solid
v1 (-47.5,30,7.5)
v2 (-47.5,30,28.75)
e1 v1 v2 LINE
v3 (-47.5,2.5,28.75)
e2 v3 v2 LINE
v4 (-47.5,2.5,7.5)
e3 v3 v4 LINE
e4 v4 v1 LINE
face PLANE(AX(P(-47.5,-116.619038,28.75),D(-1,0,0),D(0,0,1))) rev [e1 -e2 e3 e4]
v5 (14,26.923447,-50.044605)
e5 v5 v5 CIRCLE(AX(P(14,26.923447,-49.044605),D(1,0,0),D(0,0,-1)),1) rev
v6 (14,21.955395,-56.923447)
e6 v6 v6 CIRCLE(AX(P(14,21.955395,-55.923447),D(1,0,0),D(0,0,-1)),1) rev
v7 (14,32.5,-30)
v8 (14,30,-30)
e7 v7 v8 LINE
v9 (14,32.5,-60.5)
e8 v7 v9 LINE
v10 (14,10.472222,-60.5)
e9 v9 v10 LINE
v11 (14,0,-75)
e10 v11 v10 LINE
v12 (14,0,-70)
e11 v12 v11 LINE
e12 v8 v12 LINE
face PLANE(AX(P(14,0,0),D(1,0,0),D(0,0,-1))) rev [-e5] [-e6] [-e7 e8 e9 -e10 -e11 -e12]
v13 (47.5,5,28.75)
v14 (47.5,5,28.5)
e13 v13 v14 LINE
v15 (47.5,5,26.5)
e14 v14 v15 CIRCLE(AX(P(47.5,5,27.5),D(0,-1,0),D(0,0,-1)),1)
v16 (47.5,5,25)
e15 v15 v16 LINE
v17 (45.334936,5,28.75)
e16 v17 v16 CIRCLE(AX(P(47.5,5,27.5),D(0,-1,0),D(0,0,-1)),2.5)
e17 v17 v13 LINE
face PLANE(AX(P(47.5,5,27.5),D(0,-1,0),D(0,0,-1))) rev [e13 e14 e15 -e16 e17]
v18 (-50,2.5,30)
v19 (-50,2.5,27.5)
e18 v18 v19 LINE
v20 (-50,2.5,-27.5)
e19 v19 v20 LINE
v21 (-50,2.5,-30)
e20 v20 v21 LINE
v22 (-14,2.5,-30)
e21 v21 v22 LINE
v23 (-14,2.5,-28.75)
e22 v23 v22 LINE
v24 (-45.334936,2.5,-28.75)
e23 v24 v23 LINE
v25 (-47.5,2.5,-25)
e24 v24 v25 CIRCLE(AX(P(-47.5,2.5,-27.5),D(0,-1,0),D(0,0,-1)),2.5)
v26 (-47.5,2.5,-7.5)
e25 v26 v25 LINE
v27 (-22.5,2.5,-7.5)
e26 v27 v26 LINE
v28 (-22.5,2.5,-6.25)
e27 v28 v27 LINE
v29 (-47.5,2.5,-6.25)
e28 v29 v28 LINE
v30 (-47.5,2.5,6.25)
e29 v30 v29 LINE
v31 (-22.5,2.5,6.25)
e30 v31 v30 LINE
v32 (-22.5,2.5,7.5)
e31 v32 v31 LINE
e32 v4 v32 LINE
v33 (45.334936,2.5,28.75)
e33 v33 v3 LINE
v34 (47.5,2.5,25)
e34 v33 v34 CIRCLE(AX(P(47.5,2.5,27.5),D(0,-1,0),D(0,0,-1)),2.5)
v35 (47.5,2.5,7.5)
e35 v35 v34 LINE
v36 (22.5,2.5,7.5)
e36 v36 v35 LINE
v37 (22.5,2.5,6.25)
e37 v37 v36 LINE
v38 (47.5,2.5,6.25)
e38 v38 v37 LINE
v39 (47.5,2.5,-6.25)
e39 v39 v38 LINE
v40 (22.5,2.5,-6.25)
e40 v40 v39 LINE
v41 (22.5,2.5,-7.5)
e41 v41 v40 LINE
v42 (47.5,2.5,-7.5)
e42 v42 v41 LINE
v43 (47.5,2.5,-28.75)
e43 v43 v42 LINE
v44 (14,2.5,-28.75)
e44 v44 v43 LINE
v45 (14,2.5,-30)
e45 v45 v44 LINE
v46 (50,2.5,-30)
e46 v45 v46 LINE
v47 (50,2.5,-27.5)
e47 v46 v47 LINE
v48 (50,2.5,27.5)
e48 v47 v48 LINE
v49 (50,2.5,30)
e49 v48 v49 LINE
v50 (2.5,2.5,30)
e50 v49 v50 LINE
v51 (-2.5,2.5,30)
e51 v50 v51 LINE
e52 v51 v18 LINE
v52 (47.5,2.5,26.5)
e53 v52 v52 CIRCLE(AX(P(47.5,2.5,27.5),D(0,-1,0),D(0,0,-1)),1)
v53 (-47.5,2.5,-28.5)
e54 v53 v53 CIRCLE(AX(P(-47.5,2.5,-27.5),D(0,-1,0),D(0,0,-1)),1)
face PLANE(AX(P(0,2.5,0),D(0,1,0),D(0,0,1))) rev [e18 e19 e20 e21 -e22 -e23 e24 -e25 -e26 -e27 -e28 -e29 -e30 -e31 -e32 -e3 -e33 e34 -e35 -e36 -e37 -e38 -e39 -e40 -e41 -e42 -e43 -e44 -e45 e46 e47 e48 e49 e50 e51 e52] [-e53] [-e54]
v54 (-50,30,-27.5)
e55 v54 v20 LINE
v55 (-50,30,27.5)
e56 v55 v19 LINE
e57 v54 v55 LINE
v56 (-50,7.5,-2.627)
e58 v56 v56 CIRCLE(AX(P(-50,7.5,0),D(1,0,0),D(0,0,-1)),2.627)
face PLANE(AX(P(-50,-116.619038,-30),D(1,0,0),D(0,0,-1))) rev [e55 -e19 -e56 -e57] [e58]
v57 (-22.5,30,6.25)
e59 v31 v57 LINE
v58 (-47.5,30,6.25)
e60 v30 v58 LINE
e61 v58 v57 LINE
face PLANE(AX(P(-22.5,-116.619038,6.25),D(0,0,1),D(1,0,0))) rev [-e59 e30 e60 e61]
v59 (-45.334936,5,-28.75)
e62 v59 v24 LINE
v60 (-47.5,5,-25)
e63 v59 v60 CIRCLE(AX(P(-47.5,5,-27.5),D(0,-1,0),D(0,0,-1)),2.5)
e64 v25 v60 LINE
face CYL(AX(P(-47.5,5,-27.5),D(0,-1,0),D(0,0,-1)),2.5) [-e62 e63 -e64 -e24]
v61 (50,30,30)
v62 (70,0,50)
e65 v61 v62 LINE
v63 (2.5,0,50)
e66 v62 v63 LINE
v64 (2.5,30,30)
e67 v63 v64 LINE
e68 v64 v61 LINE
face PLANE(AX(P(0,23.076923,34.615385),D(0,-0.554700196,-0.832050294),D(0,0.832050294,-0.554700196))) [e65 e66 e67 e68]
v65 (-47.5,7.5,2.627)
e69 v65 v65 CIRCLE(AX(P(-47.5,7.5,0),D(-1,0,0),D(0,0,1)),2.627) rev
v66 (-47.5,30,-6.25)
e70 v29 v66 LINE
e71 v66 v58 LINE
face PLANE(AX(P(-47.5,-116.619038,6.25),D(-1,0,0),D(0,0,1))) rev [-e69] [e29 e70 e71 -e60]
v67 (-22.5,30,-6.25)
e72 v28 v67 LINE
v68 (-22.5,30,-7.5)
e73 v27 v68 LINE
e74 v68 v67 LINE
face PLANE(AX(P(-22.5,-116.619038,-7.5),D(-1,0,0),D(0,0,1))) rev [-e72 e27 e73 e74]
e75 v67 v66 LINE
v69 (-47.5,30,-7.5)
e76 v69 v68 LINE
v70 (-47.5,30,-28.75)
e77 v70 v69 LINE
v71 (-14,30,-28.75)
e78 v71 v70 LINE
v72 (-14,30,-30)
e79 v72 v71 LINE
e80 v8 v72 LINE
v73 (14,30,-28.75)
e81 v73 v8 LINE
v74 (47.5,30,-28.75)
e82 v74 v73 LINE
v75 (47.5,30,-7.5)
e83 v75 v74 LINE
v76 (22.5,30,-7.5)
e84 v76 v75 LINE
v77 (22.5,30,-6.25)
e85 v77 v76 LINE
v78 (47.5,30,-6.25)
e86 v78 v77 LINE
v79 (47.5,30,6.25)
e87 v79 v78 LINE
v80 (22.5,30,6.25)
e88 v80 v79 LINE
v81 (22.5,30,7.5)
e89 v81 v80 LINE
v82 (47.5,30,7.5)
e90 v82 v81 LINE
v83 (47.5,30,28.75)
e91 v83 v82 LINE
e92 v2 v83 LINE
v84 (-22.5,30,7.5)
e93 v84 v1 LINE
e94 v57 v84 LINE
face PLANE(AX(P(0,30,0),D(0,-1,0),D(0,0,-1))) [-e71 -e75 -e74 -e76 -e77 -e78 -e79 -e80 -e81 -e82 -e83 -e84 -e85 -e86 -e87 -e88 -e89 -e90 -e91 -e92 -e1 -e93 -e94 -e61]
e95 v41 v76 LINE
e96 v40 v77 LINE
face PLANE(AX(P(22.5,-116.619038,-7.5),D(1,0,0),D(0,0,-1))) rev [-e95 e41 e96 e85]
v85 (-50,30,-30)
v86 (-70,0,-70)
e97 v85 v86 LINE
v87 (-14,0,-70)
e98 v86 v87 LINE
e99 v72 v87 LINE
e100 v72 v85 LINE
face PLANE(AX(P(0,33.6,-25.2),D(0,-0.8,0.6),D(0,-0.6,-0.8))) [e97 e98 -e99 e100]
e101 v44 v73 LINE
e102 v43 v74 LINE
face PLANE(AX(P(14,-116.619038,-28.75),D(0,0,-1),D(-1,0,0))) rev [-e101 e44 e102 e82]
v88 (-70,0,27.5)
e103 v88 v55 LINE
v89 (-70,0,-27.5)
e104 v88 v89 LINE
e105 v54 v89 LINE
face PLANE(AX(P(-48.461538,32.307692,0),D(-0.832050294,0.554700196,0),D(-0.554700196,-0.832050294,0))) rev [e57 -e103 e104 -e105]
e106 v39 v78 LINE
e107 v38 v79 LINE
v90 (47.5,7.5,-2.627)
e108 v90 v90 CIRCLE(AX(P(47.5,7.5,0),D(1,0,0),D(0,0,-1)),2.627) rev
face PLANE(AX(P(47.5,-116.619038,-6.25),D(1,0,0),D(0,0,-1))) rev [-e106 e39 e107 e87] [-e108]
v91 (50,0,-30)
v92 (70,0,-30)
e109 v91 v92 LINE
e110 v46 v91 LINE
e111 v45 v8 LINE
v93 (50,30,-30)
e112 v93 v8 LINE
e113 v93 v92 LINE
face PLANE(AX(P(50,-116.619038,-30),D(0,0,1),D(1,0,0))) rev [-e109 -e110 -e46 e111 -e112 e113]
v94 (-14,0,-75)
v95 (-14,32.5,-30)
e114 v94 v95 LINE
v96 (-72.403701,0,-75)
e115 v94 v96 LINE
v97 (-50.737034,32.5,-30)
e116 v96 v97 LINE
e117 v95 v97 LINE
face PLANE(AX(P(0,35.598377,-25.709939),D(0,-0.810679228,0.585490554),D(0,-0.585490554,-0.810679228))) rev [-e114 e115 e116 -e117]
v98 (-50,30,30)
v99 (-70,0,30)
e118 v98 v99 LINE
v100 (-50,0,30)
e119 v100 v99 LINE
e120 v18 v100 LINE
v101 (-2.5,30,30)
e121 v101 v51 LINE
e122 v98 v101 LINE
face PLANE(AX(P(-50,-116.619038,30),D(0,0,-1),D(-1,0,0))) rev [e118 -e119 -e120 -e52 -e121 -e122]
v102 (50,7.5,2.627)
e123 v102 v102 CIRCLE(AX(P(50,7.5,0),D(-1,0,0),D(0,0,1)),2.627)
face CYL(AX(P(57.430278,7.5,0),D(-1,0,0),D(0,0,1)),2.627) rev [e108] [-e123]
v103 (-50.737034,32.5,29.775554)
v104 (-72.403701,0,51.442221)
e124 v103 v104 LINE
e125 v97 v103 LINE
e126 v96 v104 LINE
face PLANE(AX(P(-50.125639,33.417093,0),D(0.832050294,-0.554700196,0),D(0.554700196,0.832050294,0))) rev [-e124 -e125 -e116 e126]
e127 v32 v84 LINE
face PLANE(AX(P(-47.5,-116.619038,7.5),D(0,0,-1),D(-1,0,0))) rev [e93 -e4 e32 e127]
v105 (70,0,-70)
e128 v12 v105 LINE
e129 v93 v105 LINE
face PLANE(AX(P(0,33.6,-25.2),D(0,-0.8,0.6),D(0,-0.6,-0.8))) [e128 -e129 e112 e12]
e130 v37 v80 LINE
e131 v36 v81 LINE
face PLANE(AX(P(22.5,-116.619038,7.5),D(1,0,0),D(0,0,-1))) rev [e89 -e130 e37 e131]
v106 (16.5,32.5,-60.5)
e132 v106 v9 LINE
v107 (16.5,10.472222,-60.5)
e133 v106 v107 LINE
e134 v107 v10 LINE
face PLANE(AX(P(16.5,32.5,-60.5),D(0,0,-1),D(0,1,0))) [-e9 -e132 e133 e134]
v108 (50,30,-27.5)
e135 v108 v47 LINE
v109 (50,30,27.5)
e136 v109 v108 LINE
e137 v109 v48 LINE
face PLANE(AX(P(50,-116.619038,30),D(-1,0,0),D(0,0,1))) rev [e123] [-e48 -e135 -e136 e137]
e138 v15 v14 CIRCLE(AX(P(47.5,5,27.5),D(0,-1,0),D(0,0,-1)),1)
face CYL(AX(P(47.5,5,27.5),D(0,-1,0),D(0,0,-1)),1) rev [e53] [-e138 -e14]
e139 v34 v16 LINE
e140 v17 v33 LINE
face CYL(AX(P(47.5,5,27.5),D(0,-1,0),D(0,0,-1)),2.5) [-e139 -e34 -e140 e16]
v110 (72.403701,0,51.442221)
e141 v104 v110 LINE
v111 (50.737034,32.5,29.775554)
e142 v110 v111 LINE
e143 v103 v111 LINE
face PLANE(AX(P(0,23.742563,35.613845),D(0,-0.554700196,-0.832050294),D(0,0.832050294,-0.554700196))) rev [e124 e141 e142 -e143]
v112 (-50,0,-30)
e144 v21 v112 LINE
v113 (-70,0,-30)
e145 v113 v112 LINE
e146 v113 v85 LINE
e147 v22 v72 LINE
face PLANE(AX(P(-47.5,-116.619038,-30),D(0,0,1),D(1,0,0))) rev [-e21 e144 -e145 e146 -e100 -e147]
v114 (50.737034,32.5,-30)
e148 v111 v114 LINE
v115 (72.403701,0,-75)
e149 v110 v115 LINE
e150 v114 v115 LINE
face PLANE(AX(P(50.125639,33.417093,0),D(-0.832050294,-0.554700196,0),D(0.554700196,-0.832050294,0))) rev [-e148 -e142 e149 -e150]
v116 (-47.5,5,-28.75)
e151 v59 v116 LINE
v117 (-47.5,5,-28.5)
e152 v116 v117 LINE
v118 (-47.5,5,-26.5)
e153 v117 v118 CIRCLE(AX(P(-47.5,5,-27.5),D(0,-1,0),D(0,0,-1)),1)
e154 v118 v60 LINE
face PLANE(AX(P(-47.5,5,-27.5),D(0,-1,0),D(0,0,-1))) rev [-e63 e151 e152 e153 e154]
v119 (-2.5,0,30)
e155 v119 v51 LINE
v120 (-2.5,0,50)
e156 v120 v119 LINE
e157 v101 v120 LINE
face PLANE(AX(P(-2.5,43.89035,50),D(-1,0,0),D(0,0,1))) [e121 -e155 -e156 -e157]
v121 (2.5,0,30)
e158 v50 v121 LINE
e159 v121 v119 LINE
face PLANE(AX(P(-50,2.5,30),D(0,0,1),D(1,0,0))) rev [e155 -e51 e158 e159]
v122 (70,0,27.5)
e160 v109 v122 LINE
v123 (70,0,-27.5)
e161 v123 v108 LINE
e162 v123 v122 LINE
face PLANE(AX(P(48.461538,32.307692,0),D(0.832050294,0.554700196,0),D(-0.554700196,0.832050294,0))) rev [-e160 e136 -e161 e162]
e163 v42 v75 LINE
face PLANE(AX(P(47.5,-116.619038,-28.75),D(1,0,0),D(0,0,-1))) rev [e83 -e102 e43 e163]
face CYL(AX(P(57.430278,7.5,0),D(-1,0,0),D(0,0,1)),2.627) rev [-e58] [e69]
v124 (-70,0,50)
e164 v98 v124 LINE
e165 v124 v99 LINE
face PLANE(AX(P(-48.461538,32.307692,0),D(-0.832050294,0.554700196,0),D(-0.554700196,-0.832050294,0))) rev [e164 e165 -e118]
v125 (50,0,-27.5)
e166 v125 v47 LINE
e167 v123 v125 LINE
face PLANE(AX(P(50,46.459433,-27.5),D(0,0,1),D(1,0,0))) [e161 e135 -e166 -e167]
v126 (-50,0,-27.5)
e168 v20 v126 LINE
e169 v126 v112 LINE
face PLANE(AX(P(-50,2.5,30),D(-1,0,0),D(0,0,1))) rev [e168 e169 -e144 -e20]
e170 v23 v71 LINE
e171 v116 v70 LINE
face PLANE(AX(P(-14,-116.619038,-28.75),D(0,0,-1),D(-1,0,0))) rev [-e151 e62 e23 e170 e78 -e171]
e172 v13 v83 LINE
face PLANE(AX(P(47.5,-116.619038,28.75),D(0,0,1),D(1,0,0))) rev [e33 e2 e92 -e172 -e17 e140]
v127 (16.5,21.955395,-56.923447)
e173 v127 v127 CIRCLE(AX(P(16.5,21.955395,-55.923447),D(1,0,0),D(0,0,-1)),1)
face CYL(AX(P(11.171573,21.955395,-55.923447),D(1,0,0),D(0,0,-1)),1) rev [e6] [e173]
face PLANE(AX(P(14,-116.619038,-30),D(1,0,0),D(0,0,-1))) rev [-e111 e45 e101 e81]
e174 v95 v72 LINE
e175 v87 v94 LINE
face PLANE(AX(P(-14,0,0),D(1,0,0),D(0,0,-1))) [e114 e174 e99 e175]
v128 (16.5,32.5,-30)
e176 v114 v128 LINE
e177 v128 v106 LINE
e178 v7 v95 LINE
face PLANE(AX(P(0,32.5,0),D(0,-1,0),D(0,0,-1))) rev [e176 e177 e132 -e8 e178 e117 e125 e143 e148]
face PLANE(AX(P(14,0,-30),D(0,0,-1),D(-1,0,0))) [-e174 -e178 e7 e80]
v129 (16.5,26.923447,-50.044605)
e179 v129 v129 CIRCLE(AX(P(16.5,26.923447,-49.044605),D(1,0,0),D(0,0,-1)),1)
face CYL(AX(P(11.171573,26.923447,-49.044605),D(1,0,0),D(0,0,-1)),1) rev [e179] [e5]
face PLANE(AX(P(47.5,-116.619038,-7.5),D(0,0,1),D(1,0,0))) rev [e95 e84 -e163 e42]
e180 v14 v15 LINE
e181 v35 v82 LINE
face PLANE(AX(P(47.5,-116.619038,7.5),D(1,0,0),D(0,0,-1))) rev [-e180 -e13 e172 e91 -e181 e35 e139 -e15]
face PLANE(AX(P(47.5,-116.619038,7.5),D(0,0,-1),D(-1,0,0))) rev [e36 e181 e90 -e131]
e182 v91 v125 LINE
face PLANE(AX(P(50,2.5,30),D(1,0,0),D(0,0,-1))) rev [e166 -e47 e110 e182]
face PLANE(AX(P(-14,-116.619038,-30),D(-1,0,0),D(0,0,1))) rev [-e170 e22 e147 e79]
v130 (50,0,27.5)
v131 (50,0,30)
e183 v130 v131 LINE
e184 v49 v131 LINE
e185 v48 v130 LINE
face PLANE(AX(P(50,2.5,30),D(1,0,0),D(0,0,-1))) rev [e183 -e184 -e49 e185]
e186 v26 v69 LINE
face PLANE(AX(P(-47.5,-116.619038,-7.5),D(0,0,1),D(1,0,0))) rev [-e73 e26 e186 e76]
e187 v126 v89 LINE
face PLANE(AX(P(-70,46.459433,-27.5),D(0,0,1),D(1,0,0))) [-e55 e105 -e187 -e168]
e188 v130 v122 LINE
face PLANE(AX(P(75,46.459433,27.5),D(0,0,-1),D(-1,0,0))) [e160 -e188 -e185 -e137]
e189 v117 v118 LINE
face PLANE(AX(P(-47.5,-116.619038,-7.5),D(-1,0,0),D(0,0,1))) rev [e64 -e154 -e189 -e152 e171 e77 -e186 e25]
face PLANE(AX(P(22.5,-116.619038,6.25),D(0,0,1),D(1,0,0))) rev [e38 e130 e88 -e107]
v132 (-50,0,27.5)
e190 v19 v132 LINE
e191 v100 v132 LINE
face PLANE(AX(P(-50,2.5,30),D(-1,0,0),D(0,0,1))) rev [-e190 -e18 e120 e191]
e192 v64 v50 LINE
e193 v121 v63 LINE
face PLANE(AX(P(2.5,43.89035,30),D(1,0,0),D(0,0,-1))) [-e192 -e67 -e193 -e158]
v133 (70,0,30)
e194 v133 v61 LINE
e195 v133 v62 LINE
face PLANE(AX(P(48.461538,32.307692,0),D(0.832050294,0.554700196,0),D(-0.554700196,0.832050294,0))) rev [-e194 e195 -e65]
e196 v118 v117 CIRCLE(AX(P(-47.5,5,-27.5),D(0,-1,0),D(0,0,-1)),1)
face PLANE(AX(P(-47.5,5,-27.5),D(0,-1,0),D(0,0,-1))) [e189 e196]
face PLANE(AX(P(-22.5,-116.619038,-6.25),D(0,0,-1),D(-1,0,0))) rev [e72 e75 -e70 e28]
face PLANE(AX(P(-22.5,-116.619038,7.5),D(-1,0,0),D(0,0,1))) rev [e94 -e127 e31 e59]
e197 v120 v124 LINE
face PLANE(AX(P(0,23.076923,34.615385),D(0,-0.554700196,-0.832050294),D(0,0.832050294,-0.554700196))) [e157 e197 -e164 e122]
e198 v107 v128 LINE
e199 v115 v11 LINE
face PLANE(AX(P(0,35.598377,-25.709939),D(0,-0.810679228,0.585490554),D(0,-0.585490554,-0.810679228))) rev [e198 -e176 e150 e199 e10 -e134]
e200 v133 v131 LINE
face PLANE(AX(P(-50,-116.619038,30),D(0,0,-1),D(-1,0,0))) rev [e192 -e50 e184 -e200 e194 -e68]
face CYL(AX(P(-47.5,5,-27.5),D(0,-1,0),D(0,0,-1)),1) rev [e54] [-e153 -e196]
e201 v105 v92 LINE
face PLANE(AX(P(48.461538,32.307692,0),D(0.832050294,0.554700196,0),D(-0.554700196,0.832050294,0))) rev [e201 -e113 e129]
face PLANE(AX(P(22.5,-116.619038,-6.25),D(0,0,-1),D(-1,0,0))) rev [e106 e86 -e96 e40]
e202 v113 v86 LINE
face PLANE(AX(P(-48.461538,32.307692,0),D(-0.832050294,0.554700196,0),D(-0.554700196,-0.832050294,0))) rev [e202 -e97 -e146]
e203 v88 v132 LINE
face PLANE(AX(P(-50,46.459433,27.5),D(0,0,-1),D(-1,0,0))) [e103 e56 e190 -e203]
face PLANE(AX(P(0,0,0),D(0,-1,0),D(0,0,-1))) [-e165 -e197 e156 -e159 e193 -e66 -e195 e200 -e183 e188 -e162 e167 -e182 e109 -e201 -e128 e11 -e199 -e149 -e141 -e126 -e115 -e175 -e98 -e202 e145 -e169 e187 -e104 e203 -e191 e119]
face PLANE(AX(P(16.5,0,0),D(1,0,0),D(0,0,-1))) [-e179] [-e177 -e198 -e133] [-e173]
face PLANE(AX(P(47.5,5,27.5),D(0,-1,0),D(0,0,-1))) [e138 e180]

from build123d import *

# Parameters (mm, degrees)
CUT_EXTRUDE3_START      = -32.5
SKETCH7_W               = 100
SKETCH7_H               = 60
CUT_EXTRUDE3_DEPTH      = 30
CUT_EXTRUDE6_DEPTH      = 14
CUT_EXTRUDE6_DEPTH_BACK = 14
BOSS_EXTRUDE1_DEPTH     = 2.5
BOSS_EXTRUDE2_DEPTH     = 30
BOSS_EXTRUDE3_START     = -2.5
BOSS_EXTRUDE3_DEPTH     = 5
BOSS_EXTRUDE4_START     = -30
BOSS_EXTRUDE4_DEPTH     = 2.5
BOSS_EXTRUDE4_START_2   = 27.5
BOSS_EXTRUDE4_2_DEPTH   = 2.5
BOSS_EXTRUDE5_START     = -30
BOSS_EXTRUDE5_DEPTH     = 2.5
BOSS_EXTRUDE5_START_2   = 27.5
BOSS_EXTRUDE5_2_DEPTH   = 2.5
SKETCH20_W              = 100
SKETCH20_H              = 60
CUT_EXTRUDE7_DEPTH      = 2.5
CUT_EXTRUDE8_START      = -2.5
SKETCH21_R              = 2.627
CUT_EXTRUDE8_DEPTH      = 100
SKETCH13_R              = 1
CUT_EXTRUDE9_DEPTH      = 2.5
CUT_EXTRUDE11_START     = -1.2
SKETCH23_W              = 181.319522923
SKETCH23_H              = 53.809633396
CUT_EXTRUDE11_DEPTH     = 4
SKETCH24_R              = 2.5
BOSS_EXTRUDE6_DEPTH     = 2.5
SKETCH25_R              = 1
CUT_EXTRUDE12_DEPTH     = 2.5
CUT_EXTRUDE13_START     = -2
SKETCH26_W              = 145.47086515
SKETCH26_H              = 58.938684545
CUT_EXTRUDE13_DEPTH     = 2.5
CUT_EXTRUDE14_START     = -2
SKETCH27_W              = 157.368673289
SKETCH27_H              = 83.270010287
CUT_EXTRUDE14_DEPTH     = 2.5


# Read off the part's stored shape, not the designer's step: Boss-Extrude3, Boss-Extrude4, Boss-Extrude5
with BuildPart() as part:
    # Sketch1 → Loft1 section 0
    with BuildSketch(Plane(origin=(0, 0, 0), x_dir=(1, 0, 0), z_dir=(0, 1, 0))):
        with BuildLine():
            Line((-75, -55), (-75, 75))
            Line((-75, 75), (75, 75))
            Line((75, 75), (75, -55))
            Line((75, -55), (-75, -55))
        make_face()
    # Sketch2 → Loft1 section 1
    with BuildSketch(Plane(origin=(0, 32.5, 0), x_dir=(1, 0, 0), z_dir=(0, 1, 0))):
        with BuildLine():
            Line((-52.5, -30), (52.5, -30))
            Line((52.5, -30), (52.5, 30))
            Line((52.5, 30), (-52.5, 30))
            Line((-52.5, 30), (-52.5, -30))
        make_face()
    loft()

    # Sketch7 → Cut-Extrude3 (cut)
    with BuildSketch(Plane(origin=(0, 32.5, 0), x_dir=(1, 0, 0), z_dir=(0, 1, 0)).offset(CUT_EXTRUDE3_START)):
        Rectangle(SKETCH7_W, SKETCH7_H)
    extrude(amount=CUT_EXTRUDE3_DEPTH, mode=Mode.SUBTRACT)

    # Sketch8 → Cut-Extrude6 (cut, two sides: drawn at the far end of the back side and taken through both)
    with BuildSketch(Plane(origin=(0, 0, 0), x_dir=(0, 0, -1), z_dir=(1, 0, 0)).offset(-CUT_EXTRUDE6_DEPTH_BACK)):
        Polygon((30, 35.583833793), (79.269923714, 0), (30, 0), align=None)
    extrude(amount=CUT_EXTRUDE6_DEPTH + CUT_EXTRUDE6_DEPTH_BACK, mode=Mode.SUBTRACT)

    # Sketch11 → Cut-Loft1 section 0
    with BuildSketch(Plane.XZ.offset(-30)):
        with BuildLine():
            Line((-50, 30), (50, 30))
            Line((50, 30), (50, -30))
            Line((50, -30), (-50, -30))
            Line((-50, -30), (-50, 30))
        make_face()
    # Sketch9 → Cut-Loft1 section 1
    with BuildSketch(Plane.XZ):
        with BuildLine():
            Line((-70, 50), (70, 50))
            Line((70, 50), (70, -70))
            Line((70, -70), (-70, -70))
            Line((-70, -70), (-70, 50))
        make_face()
    loft(mode=Mode.SUBTRACT)

    # Sketch12 → Boss-Extrude1 (add)
    with BuildSketch(Plane.ZY.offset(-14)):
        Polygon((-60.5, 32.5), (-60.5, 10.472222222), (-30, 32.5), align=None)
    extrude(amount=-BOSS_EXTRUDE1_DEPTH)

    # Sketch14 → Boss-Extrude2 (add)
    with BuildSketch(Plane.XZ.offset(-30)):
        Polygon((-50, -30), (-50, 30), (50, 30), (50, -30), (14, -30), (14, -28.75), (47.5, -28.75), (47.5, -7.5), (22.5, -7.5), (22.5, -6.25), (47.5, -6.25), (47.5, 6.25), (22.5, 6.25), (22.5, 7.5), (47.5, 7.5), (47.5, 28.75), (-47.5, 28.75), (-47.5, 7.5), (-22.5, 7.5), (-22.5, 6.25), (-47.5, 6.25), (-47.5, -6.25), (-22.5, -6.25), (-22.5, -7.5), (-47.5, -7.5), (-47.5, -28.75), (-14, -28.75), (-14, -30), (-47.5, -30), align=None)
    extrude(amount=BOSS_EXTRUDE2_DEPTH)

    # Boss-Extrude3 outline → Boss-Extrude3 (add)
    with BuildSketch(Plane.YZ.offset(BOSS_EXTRUDE3_START)):
        Polygon((30, 30), (0, 50), (0, 30), align=None)
    extrude(amount=BOSS_EXTRUDE3_DEPTH)

    # Boss-Extrude4 outline → Boss-Extrude4 (add)
    with BuildSketch(Plane.XY.offset(BOSS_EXTRUDE4_START)):
        Polygon((-50, 30), (-70, 0), (-50, 0), align=None)
    extrude(amount=BOSS_EXTRUDE4_DEPTH)

    # Boss-Extrude4 2 outline → Boss-Extrude4 2 (add)
    with BuildSketch(Plane.XY.offset(BOSS_EXTRUDE4_START_2)):
        Polygon((-50, 30), (-70, 0), (-50, 0), align=None)
    extrude(amount=BOSS_EXTRUDE4_2_DEPTH)

    # Boss-Extrude5 outline → Boss-Extrude5 (add)
    with BuildSketch(Plane.XY.offset(BOSS_EXTRUDE5_START)):
        Polygon((50, 30), (50, 0), (70, 0), align=None)
    extrude(amount=BOSS_EXTRUDE5_DEPTH)

    # Boss-Extrude5 2 outline → Boss-Extrude5 2 (add)
    with BuildSketch(Plane.XY.offset(BOSS_EXTRUDE5_START_2)):
        Polygon((50, 30), (50, 0), (70, 0), align=None)
    extrude(amount=BOSS_EXTRUDE5_2_DEPTH)

    # Sketch20 → Cut-Extrude7 (cut)
    with BuildSketch(Plane.XZ):
        Rectangle(SKETCH20_W, SKETCH20_H)
    extrude(amount=-CUT_EXTRUDE7_DEPTH, mode=Mode.SUBTRACT)

    # Sketch21 → Cut-Extrude8 (cut)
    with BuildSketch(Plane(origin=(-47.5, 0, 0), x_dir=(0, 0, -1), z_dir=(1, 0, 0)).offset(CUT_EXTRUDE8_START)):
        with Locations(Location((0, 7.5, 0), (0, 0, 180))):
            Circle(SKETCH21_R)
    extrude(amount=CUT_EXTRUDE8_DEPTH, mode=Mode.SUBTRACT)

    # Sketch13 → Cut-Extrude9 (cut)
    with BuildSketch(Plane(origin=(16.5, 0, 0), x_dir=(0, 0, -1), z_dir=(1, 0, 0))):
        with Locations((55.923446724, 21.955394633)):
            Circle(SKETCH13_R)
        with Locations((49.044605367, 26.923446724)):
            Circle(SKETCH13_R)
    extrude(amount=-CUT_EXTRUDE9_DEPTH, mode=Mode.SUBTRACT)

    # Sketch23 → Cut-Extrude11 (cut)
    with BuildSketch(Plane(origin=(0, 23.076923077, 34.615384615), x_dir=(-1, 0, 0), z_dir=(0, -0.5547001962252286, -0.8320502943378442)).offset(CUT_EXTRUDE11_START)):
        with Locations((-1.646246513, -10.343211106)):
            Rectangle(SKETCH23_W, SKETCH23_H)
    extrude(amount=-CUT_EXTRUDE11_DEPTH, mode=Mode.SUBTRACT)

    # Sketch24 → Boss-Extrude6 (add)
    with BuildSketch(Plane.XZ.offset(-2.5)):
        with Locations((-47.5, -27.5)):
            Circle(SKETCH24_R)
        with Locations((47.5, 27.5)):
            Circle(SKETCH24_R)
    extrude(amount=-BOSS_EXTRUDE6_DEPTH)

    # Sketch25 → Cut-Extrude12 (cut)
    with BuildSketch(Plane.XZ.offset(-2.5)):
        with Locations(Location((-47.5, -27.5, 0), (0, 0, 270))):
            Circle(SKETCH25_R)
        with Locations(Location((47.5, 27.5, 0), (0, 0, 270))):
            Circle(SKETCH25_R)
    extrude(amount=-CUT_EXTRUDE12_DEPTH, mode=Mode.SUBTRACT)

    # Sketch26 → Cut-Extrude13 (cut)
    with BuildSketch(Plane(origin=(-48.461538462, 32.307692308, 0), x_dir=(0, 0, -1), z_dir=(0.8320502943378436, -0.5547001962252295, 0)).offset(CUT_EXTRUDE13_START)):
        with Locations((11.121253107, -16.230406727)):
            Rectangle(SKETCH26_W, SKETCH26_H)
    extrude(amount=-CUT_EXTRUDE13_DEPTH, mode=Mode.SUBTRACT)

    # Sketch27 → Cut-Extrude14 (cut)
    with BuildSketch(Plane(origin=(48.461538462, 32.307692308, 0), x_dir=(0, 0, 1), z_dir=(-0.8320502943378442, -0.5547001962252287, 0)).offset(CUT_EXTRUDE14_START)):
        with Locations((-8.576197042, -8.380711465)):
            Rectangle(SKETCH27_W, SKETCH27_H)
    extrude(amount=-CUT_EXTRUDE14_DEPTH, mode=Mode.SUBTRACT)


solid = part.part
